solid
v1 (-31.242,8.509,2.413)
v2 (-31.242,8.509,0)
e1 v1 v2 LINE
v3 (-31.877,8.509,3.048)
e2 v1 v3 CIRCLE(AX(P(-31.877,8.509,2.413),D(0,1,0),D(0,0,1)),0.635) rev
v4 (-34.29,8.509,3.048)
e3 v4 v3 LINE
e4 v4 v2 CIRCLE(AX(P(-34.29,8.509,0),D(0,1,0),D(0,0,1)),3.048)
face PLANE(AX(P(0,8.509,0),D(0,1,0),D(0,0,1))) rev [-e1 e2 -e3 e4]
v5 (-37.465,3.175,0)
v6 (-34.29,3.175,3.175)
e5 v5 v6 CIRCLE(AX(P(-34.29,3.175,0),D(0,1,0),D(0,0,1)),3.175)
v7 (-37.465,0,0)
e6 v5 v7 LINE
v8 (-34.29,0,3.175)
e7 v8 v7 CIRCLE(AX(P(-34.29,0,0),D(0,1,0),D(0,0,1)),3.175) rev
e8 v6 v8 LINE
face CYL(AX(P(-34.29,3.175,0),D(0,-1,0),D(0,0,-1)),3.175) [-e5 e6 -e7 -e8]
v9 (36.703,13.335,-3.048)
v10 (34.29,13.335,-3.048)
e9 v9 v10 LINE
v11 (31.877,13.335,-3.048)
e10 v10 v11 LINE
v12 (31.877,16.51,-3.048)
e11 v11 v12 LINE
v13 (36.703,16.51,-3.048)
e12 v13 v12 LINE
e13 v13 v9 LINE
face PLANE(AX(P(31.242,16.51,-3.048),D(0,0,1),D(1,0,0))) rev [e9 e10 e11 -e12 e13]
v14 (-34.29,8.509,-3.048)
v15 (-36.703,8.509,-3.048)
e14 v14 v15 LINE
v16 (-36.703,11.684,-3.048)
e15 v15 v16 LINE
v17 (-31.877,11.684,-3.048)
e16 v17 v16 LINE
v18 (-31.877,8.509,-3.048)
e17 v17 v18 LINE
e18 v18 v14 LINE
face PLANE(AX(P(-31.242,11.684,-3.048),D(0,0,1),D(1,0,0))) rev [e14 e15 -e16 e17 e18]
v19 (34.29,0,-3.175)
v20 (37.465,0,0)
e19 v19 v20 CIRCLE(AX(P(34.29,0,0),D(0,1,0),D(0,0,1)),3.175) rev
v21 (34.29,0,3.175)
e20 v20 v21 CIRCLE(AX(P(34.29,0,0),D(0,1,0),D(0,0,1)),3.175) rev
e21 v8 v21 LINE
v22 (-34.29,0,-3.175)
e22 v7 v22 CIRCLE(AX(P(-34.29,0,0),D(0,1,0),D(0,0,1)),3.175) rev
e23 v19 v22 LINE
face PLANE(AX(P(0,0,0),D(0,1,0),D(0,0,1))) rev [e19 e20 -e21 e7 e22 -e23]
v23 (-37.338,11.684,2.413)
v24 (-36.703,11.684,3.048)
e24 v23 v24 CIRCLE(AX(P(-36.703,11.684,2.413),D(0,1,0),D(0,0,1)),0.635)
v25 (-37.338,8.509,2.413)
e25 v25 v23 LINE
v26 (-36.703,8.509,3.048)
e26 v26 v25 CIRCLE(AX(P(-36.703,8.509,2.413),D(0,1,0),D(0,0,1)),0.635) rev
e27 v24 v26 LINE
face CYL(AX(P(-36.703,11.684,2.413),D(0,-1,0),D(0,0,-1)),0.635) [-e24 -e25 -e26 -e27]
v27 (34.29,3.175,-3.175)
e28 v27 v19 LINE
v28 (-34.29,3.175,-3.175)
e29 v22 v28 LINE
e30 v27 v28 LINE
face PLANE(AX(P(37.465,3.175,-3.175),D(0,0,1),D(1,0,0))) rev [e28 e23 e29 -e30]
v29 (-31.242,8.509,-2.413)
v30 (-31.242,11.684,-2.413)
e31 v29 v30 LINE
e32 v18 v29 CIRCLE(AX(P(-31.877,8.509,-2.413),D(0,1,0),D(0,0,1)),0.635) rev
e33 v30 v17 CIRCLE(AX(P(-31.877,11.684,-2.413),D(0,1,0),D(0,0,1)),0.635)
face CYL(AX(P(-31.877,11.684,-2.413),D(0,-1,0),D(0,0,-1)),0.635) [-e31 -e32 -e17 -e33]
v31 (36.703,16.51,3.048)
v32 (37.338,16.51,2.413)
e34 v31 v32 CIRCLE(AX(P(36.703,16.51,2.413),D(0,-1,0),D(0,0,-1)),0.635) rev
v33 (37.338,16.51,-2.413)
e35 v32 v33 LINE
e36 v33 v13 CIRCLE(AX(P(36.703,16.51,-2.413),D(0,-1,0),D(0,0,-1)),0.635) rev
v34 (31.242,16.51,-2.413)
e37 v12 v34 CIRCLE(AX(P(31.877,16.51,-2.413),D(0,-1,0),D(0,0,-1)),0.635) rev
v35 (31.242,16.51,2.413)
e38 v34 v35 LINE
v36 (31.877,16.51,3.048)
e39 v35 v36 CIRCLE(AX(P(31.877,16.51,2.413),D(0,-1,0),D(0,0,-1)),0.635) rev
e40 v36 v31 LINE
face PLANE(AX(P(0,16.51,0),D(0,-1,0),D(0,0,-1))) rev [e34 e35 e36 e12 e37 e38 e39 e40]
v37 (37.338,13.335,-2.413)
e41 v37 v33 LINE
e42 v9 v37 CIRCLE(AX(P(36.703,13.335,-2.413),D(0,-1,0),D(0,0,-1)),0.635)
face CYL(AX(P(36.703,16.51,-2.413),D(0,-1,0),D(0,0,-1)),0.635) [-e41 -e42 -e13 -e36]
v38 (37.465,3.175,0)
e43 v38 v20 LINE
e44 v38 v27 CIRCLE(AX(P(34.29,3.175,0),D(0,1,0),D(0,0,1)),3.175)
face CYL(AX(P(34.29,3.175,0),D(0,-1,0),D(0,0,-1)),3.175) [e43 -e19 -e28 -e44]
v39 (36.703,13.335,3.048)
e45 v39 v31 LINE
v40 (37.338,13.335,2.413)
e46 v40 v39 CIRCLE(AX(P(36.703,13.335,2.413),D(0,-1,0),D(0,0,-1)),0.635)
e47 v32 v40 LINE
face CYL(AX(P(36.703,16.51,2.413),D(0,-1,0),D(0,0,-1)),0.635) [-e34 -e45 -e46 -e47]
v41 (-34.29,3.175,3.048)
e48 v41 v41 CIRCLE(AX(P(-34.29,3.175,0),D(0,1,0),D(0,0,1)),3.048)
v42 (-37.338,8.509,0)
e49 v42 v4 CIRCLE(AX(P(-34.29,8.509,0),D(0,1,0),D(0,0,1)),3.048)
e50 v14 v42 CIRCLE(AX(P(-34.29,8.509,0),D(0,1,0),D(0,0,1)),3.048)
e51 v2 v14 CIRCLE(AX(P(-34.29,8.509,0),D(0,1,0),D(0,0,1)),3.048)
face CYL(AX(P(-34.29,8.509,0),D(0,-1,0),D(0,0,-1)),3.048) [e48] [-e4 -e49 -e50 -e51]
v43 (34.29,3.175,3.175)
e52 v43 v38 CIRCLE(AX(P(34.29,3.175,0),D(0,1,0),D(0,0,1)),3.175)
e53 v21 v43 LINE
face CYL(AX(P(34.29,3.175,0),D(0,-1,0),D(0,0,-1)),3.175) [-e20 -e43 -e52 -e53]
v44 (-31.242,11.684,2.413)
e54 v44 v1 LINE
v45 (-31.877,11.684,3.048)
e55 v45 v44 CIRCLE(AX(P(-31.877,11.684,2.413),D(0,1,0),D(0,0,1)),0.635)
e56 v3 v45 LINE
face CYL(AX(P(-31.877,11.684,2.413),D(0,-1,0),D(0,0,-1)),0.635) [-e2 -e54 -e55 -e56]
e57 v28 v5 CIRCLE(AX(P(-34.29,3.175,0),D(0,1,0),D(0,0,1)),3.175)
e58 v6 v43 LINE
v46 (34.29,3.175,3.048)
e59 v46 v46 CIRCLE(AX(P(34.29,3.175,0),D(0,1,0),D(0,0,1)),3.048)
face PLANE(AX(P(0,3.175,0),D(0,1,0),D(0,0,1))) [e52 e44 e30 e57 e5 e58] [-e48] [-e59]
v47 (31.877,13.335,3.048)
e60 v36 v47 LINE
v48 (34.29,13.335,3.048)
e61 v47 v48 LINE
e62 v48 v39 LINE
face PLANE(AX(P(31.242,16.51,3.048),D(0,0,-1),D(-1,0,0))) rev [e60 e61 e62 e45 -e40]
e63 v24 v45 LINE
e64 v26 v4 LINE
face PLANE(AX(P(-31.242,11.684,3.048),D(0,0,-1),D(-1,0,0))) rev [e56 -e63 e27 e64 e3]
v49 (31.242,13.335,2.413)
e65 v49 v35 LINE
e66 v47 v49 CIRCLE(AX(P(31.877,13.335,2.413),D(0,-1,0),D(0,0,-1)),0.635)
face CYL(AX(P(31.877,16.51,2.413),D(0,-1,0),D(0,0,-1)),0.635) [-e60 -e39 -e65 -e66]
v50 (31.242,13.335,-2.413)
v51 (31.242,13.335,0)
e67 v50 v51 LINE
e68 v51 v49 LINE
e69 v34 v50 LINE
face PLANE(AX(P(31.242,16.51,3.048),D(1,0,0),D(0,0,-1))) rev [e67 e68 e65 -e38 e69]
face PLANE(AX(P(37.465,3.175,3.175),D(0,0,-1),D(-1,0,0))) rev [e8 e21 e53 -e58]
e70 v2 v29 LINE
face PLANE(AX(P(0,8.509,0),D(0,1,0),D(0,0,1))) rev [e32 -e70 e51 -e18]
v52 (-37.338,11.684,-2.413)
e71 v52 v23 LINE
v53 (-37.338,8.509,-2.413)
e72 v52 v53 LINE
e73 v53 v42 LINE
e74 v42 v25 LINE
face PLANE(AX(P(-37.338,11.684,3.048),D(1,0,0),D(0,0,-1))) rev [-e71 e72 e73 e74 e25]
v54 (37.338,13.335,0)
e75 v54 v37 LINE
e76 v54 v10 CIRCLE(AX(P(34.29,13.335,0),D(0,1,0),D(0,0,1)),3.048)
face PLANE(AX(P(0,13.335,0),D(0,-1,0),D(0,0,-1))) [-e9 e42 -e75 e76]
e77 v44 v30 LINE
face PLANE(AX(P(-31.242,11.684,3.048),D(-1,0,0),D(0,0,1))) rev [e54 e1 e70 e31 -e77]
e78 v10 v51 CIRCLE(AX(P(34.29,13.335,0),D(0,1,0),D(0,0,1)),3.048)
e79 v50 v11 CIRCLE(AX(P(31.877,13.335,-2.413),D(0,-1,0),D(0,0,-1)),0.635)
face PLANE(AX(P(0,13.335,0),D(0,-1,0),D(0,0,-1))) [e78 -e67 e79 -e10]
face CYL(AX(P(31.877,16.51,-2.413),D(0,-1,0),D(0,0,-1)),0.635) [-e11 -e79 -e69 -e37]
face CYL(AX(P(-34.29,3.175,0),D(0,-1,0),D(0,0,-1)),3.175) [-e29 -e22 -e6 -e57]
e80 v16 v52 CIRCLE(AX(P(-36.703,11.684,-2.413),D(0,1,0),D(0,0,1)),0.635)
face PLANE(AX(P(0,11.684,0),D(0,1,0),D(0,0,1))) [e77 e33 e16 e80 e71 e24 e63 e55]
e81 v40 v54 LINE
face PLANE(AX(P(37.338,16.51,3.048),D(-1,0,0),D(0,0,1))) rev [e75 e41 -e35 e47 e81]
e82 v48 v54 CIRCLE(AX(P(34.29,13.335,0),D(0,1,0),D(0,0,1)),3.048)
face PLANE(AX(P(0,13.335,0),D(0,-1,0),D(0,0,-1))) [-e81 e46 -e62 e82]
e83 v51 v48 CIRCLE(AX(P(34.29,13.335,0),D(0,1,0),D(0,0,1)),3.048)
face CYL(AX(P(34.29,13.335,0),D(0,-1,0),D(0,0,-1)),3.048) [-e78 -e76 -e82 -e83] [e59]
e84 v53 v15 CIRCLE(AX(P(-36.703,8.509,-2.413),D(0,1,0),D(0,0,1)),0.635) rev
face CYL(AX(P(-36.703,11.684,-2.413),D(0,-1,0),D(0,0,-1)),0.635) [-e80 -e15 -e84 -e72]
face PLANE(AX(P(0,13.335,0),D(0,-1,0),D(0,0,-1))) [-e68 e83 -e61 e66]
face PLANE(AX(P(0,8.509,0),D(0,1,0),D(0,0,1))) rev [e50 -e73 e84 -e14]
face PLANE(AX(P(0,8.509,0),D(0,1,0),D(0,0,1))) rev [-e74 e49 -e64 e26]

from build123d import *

# Parameters (mm, degrees)
SKETCH1_W           = 74.93
SKETCH1_H           = 6.35
BOSS_EXTRUDE1_DEPTH = 3.175
SKETCH2_R           = 3.048
BOSS_EXTRUDE2_DEPTH = 5.334
SKETCH3_W           = 6.096
SKETCH3_H           = 6.096
BOSS_EXTRUDE3_DEPTH = 3.175
SKETCH4_R           = 3.048
BOSS_EXTRUDE4_DEPTH = 10.16
SKETCH5_W           = 6.096
SKETCH5_H           = 6.096
BOSS_EXTRUDE5_DEPTH = 3.175
FILLET1_R           = 0.635
FILLET2_R           = 3.175


with BuildPart() as part:
    # Sketch1 → Boss-Extrude1 (new body)
    with BuildSketch(Plane(origin=(0, 0, 0), x_dir=(1, 0, 0), z_dir=(0, 1, 0))):
        Rectangle(SKETCH1_W, SKETCH1_H)
    extrude(amount=BOSS_EXTRUDE1_DEPTH)

    # Sketch2 → Boss-Extrude2 (add)
    with BuildSketch(Plane(origin=(0, 3.175, 0), x_dir=(1, 0, 0), z_dir=(0, 1, 0))):
        with Locations(Location((-34.29, 0, 0), (0, 0, 270))):
            Circle(SKETCH2_R)
    extrude(amount=BOSS_EXTRUDE2_DEPTH)

    # Sketch3 → Boss-Extrude3 (add)
    with BuildSketch(Plane(origin=(0, 8.509, 0), x_dir=(1, 0, 0), z_dir=(0, 1, 0))):
        with Locations((-34.29, 0)):
            Rectangle(SKETCH3_W, SKETCH3_H)
    extrude(amount=BOSS_EXTRUDE3_DEPTH)

    # Sketch4 → Boss-Extrude4 (add)
    with BuildSketch(Plane(origin=(0, 3.175, 0), x_dir=(1, 0, 0), z_dir=(0, 1, 0))):
        with Locations(Location((34.29, 0, 0), (0, 0, 270))):
            Circle(SKETCH4_R)
    extrude(amount=BOSS_EXTRUDE4_DEPTH)

    # Sketch5 → Boss-Extrude5 (add)
    with BuildSketch(Plane(origin=(0, 13.335, 0), x_dir=(1, 0, 0), z_dir=(0, 1, 0))):
        with Locations((34.29, 0)):
            Rectangle(SKETCH5_W, SKETCH5_H)
    extrude(amount=BOSS_EXTRUDE5_DEPTH)

    # Fillet1
    fillet1_edges = [part.edges().sort_by_distance(p)[0] for p in [
        (-37.338, 10.0965, -3.048),
        (-37.338, 10.0965, 3.048),
        (-31.242, 10.0965, 3.048),
        (-31.242, 10.0965, -3.048),
        (37.338, 14.9225, 3.048),
        (37.338, 14.9225, -3.048),
        (31.242, 14.9225, -3.048),
        (31.242, 14.9225, 3.048),
    ]]
    fillet(fillet1_edges, radius=FILLET1_R)

    # Fillet2
    fillet2_edges = [part.edges().sort_by_distance(p)[0] for p in [
        (-37.465, 1.5875, 3.175),
        (-37.465, 1.5875, -3.175),
        (37.465, 1.5875, -3.175),
        (37.465, 1.5875, 3.175),
    ]]
    fillet(fillet2_edges, radius=FILLET2_R - 0.0001)  # a hair under: the kernel refuses the full size


solid = part.part
